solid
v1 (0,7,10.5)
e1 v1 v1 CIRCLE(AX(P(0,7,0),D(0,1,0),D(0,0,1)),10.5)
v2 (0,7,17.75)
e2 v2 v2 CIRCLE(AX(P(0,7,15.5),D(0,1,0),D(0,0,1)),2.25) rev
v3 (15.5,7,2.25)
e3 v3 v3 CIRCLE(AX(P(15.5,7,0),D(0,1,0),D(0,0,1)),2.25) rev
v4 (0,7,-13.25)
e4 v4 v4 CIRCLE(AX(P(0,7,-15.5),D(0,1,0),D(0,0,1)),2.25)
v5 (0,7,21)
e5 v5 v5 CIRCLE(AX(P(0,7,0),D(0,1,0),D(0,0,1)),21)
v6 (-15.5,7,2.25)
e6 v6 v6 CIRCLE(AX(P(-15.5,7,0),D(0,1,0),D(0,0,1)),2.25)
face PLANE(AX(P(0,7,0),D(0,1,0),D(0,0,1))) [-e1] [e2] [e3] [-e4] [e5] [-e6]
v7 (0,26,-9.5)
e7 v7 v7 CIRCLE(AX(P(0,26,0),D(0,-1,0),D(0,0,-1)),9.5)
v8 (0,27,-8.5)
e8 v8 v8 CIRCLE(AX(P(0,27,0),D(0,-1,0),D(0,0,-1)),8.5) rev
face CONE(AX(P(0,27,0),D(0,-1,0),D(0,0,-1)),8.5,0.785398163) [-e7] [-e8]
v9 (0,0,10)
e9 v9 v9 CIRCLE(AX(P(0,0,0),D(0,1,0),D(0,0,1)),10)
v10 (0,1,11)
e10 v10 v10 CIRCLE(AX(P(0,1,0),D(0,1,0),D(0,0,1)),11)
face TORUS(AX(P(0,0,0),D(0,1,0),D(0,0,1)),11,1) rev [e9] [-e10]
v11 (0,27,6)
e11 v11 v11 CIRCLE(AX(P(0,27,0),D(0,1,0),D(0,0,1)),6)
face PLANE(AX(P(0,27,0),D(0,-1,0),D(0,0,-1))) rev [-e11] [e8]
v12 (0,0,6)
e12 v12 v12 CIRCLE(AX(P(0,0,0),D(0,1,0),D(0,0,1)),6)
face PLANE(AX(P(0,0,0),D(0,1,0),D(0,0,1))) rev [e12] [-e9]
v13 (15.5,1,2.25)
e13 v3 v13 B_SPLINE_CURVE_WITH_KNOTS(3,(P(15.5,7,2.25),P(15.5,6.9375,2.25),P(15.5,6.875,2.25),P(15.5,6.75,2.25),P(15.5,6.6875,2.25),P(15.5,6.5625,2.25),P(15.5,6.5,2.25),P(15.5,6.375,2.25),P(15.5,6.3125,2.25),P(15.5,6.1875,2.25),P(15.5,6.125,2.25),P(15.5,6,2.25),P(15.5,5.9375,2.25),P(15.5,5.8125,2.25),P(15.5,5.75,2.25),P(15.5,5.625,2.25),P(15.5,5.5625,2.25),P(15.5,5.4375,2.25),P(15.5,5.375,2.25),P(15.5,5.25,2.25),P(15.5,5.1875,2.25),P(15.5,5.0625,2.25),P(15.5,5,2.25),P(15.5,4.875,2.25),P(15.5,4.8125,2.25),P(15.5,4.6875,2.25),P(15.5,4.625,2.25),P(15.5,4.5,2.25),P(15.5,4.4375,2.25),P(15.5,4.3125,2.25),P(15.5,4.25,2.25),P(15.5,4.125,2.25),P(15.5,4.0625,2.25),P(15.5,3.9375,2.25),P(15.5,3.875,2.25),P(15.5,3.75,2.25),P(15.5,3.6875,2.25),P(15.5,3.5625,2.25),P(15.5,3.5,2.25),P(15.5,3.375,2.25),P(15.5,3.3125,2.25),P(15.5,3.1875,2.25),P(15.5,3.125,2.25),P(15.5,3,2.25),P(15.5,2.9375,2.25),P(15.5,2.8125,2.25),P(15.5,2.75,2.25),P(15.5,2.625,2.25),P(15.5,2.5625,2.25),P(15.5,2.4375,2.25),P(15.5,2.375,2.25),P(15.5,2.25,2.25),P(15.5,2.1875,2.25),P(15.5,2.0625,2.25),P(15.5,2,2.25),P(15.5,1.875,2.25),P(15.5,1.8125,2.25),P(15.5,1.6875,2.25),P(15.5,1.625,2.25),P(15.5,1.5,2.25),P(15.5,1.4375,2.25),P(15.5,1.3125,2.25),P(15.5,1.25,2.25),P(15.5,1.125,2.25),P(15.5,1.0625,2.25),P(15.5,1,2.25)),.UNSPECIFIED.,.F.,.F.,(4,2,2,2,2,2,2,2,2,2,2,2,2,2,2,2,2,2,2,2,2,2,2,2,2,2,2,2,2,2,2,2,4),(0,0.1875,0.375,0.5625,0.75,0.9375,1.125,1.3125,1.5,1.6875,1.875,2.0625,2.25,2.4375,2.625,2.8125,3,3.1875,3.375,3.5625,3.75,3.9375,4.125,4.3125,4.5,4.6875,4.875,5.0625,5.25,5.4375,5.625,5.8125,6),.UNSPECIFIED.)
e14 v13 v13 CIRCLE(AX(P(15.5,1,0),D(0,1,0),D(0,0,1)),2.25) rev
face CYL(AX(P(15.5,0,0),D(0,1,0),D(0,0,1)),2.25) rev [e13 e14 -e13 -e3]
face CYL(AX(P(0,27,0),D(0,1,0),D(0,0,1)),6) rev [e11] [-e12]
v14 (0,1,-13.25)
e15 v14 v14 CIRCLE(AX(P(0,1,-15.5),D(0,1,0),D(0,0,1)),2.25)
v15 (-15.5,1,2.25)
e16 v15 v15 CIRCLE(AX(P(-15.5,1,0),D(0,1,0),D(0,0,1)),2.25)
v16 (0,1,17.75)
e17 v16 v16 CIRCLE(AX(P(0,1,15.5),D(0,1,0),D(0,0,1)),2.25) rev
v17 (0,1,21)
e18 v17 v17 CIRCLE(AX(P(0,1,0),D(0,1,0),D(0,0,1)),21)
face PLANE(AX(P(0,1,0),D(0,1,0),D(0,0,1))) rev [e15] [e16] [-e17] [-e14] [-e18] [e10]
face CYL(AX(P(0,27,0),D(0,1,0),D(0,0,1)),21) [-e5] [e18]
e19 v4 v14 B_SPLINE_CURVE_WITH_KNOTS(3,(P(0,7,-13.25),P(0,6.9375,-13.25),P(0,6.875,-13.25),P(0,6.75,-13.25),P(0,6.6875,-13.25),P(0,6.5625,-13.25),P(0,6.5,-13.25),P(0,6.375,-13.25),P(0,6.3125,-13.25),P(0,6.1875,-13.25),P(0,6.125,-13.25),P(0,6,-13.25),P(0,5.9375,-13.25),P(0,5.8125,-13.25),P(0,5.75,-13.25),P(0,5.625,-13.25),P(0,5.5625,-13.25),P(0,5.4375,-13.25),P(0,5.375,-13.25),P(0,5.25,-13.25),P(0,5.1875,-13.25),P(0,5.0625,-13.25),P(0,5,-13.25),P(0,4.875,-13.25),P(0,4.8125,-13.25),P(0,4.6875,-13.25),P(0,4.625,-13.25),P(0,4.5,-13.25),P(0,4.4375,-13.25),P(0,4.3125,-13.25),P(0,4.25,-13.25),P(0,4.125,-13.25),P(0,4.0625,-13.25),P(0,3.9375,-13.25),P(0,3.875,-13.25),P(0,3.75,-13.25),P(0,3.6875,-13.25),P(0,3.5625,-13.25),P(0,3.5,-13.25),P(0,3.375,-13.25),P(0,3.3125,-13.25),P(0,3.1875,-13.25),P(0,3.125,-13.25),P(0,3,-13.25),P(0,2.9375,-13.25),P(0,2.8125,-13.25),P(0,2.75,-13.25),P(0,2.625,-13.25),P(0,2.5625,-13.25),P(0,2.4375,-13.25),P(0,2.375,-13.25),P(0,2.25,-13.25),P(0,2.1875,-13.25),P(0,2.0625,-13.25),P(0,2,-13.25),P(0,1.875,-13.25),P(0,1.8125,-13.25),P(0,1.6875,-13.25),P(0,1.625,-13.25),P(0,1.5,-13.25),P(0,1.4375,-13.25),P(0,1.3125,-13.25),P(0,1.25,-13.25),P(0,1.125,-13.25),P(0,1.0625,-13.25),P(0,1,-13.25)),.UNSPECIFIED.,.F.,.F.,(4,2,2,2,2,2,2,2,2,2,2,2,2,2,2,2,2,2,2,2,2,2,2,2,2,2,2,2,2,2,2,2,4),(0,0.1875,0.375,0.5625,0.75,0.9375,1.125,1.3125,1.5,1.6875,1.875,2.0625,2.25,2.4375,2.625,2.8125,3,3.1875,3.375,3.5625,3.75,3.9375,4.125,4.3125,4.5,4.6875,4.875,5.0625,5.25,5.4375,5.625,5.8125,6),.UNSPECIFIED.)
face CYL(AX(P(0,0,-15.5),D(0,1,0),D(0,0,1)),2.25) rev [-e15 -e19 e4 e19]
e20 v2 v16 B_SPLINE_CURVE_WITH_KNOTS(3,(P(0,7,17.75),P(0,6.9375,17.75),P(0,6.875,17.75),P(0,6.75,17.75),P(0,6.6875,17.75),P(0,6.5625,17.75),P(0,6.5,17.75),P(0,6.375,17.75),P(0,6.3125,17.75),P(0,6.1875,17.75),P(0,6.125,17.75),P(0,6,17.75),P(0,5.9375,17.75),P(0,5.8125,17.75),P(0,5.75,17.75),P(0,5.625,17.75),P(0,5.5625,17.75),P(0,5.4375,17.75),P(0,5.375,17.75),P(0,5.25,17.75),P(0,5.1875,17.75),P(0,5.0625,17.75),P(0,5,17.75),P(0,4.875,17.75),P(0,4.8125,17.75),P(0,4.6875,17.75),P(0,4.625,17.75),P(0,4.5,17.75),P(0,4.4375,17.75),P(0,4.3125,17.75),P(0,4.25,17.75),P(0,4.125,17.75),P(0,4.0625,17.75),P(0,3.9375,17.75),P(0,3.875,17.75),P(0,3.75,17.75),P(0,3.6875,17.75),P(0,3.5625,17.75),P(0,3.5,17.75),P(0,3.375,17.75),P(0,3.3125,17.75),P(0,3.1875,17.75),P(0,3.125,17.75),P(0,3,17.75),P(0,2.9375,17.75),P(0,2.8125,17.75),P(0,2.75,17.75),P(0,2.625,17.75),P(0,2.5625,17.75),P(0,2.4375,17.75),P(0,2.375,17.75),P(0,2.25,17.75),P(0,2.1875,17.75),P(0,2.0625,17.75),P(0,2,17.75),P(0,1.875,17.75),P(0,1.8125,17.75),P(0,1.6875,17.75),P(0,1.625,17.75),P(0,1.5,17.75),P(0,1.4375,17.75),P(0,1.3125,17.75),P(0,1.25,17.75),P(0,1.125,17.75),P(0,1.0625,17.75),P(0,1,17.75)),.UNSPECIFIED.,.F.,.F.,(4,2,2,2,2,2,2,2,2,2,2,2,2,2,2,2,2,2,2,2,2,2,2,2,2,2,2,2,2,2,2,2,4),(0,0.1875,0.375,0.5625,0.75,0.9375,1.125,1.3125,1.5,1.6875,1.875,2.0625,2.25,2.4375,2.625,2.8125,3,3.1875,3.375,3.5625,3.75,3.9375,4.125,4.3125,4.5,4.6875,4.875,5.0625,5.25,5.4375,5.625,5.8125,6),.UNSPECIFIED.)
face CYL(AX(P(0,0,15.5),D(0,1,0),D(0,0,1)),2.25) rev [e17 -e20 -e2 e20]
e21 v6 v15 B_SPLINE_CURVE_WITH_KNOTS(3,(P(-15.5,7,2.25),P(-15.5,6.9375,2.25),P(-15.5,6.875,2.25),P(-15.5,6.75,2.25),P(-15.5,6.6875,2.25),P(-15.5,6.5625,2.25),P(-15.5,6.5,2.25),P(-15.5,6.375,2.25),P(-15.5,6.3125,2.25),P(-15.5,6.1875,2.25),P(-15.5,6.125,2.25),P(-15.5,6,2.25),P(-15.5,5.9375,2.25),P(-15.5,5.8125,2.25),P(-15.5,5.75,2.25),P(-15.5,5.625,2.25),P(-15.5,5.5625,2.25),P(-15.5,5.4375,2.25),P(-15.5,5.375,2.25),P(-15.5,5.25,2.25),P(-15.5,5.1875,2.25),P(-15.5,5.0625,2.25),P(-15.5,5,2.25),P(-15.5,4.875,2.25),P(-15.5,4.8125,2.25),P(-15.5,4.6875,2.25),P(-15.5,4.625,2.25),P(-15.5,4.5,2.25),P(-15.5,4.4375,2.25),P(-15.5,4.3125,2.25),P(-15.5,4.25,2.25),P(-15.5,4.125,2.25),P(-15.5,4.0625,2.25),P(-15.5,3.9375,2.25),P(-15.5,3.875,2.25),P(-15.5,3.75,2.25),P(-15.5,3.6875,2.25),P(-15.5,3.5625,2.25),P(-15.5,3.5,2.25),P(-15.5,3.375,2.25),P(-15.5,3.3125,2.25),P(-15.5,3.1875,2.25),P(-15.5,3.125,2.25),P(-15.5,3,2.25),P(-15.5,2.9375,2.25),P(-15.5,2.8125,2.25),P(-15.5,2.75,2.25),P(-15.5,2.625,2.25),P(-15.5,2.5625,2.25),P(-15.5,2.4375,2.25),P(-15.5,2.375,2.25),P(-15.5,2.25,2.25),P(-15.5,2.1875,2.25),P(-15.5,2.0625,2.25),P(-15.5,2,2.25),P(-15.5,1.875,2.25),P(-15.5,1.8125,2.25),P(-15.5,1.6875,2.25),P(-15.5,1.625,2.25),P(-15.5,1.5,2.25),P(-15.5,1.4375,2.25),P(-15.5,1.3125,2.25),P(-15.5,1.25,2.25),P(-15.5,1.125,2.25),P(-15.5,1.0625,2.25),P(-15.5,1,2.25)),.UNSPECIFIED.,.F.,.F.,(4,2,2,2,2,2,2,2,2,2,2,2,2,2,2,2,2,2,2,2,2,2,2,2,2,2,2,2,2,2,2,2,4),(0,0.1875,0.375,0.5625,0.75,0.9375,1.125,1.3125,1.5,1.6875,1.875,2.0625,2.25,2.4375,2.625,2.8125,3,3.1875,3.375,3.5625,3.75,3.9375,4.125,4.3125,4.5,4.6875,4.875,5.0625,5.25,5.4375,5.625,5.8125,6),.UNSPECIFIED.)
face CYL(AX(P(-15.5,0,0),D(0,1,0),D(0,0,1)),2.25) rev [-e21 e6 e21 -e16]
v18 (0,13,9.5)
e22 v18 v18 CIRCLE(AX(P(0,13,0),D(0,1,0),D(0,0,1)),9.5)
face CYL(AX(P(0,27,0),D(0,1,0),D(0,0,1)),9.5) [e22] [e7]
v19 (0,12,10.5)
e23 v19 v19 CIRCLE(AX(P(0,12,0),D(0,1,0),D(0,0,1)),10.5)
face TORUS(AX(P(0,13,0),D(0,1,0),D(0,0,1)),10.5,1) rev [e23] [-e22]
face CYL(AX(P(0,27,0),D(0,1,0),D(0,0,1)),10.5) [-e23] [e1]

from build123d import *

# Parameters (mm, degrees)
RACCORDO1_R              = 1
SMUSSO1_SIZE             = 1
RACCORDO2_R              = 1
TAGLIO_ESTRUSIONE1_DEPTH = 36.80502758


with BuildPart() as part:
    # Schizzo1 → Rivoluzione1 (revolve)
    with BuildSketch(Plane.XY, mode=Mode.PRIVATE) as rivoluzione1_sk:
        Polygon((10.5, 7), (21, 7), (21, 1), (10, 1), (10, 0), (6, 0), (6, 27), (9.5, 27), (9.5, 12), (10.5, 12), align=None)
    revolve(rivoluzione1_sk.sketch.rotate(Axis((0, 27, 0), (0, -1, 0)), 90), axis=Axis((0, 27, 0), (0, -1, 0)))

    # Raccordo1
    raccordo1_edges = [part.edges().sort_by_distance(p)[0] for p in [
        (0, 12, -9.5),
    ]]
    fillet(raccordo1_edges, radius=RACCORDO1_R - 0.0001)  # a hair under: the kernel refuses the full size

    # Smusso1
    smusso1_edges = [part.edges().sort_by_distance(p)[0] for p in [
        (0, 27, -9.5),
    ]]
    chamfer(smusso1_edges, length=SMUSSO1_SIZE)

    # Raccordo2
    raccordo2_edges = [part.edges().sort_by_distance(p)[0] for p in [
        (0, 1, -10),
    ]]
    fillet(raccordo2_edges, radius=RACCORDO2_R - 0.0001)  # a hair under: the kernel refuses the full size

    # Schizzo2 → Taglio-Estrusione1 (cut, through all)
    with BuildSketch(Plane(origin=(0, 7, 0), x_dir=(1, 0, 0), z_dir=(0, 1, 0))):
        with BuildLine():
            ThreePointArc((2.25, 15.5), (1.590990258, 17.090990258), (0, 17.75))
            Line((0, 17.75), (0, 13.25))
            ThreePointArc((0, 13.25), (1.590990258, 13.909009742), (2.25, 15.5))
        make_face()
        with BuildLine():
            Line((0, 13.25), (0, 17.75))
            ThreePointArc((0, 17.75), (-2.25, 15.5), (0, 13.25))
        make_face()
        with BuildLine():
            ThreePointArc((17.75, 0), (15.5, 2.25), (13.25, 0))
            Line((13.25, 0), (17.75, 0))
        make_face()
        with BuildLine():
            Line((17.75, 0), (13.25, 0))
            ThreePointArc((13.25, 0), (15.5, -2.25), (17.75, 0))
        make_face()
        with BuildLine():
            ThreePointArc((2.25, -15.5), (1.590990258, -13.909009742), (0, -13.25))
            Line((0, -13.25), (0, -17.75))
            ThreePointArc((0, -17.75), (1.590990258, -17.090990258), (2.25, -15.5))
        make_face()
        with BuildLine():
            Line((0, -17.75), (0, -13.25))
            ThreePointArc((0, -13.25), (-2.25, -15.5), (0, -17.75))
        make_face()
        with BuildLine():
            ThreePointArc((-17.75, 0), (-15.5, -2.25), (-13.25, 0))
            Line((-13.25, 0), (-17.75, 0))
        make_face()
        with BuildLine():
            Line((-17.75, 0), (-13.25, 0))
            ThreePointArc((-13.25, 0), (-15.5, 2.25), (-17.75, 0))
        make_face()
    extrude(amount=-TAGLIO_ESTRUSIONE1_DEPTH, mode=Mode.SUBTRACT)


solid = part.part
